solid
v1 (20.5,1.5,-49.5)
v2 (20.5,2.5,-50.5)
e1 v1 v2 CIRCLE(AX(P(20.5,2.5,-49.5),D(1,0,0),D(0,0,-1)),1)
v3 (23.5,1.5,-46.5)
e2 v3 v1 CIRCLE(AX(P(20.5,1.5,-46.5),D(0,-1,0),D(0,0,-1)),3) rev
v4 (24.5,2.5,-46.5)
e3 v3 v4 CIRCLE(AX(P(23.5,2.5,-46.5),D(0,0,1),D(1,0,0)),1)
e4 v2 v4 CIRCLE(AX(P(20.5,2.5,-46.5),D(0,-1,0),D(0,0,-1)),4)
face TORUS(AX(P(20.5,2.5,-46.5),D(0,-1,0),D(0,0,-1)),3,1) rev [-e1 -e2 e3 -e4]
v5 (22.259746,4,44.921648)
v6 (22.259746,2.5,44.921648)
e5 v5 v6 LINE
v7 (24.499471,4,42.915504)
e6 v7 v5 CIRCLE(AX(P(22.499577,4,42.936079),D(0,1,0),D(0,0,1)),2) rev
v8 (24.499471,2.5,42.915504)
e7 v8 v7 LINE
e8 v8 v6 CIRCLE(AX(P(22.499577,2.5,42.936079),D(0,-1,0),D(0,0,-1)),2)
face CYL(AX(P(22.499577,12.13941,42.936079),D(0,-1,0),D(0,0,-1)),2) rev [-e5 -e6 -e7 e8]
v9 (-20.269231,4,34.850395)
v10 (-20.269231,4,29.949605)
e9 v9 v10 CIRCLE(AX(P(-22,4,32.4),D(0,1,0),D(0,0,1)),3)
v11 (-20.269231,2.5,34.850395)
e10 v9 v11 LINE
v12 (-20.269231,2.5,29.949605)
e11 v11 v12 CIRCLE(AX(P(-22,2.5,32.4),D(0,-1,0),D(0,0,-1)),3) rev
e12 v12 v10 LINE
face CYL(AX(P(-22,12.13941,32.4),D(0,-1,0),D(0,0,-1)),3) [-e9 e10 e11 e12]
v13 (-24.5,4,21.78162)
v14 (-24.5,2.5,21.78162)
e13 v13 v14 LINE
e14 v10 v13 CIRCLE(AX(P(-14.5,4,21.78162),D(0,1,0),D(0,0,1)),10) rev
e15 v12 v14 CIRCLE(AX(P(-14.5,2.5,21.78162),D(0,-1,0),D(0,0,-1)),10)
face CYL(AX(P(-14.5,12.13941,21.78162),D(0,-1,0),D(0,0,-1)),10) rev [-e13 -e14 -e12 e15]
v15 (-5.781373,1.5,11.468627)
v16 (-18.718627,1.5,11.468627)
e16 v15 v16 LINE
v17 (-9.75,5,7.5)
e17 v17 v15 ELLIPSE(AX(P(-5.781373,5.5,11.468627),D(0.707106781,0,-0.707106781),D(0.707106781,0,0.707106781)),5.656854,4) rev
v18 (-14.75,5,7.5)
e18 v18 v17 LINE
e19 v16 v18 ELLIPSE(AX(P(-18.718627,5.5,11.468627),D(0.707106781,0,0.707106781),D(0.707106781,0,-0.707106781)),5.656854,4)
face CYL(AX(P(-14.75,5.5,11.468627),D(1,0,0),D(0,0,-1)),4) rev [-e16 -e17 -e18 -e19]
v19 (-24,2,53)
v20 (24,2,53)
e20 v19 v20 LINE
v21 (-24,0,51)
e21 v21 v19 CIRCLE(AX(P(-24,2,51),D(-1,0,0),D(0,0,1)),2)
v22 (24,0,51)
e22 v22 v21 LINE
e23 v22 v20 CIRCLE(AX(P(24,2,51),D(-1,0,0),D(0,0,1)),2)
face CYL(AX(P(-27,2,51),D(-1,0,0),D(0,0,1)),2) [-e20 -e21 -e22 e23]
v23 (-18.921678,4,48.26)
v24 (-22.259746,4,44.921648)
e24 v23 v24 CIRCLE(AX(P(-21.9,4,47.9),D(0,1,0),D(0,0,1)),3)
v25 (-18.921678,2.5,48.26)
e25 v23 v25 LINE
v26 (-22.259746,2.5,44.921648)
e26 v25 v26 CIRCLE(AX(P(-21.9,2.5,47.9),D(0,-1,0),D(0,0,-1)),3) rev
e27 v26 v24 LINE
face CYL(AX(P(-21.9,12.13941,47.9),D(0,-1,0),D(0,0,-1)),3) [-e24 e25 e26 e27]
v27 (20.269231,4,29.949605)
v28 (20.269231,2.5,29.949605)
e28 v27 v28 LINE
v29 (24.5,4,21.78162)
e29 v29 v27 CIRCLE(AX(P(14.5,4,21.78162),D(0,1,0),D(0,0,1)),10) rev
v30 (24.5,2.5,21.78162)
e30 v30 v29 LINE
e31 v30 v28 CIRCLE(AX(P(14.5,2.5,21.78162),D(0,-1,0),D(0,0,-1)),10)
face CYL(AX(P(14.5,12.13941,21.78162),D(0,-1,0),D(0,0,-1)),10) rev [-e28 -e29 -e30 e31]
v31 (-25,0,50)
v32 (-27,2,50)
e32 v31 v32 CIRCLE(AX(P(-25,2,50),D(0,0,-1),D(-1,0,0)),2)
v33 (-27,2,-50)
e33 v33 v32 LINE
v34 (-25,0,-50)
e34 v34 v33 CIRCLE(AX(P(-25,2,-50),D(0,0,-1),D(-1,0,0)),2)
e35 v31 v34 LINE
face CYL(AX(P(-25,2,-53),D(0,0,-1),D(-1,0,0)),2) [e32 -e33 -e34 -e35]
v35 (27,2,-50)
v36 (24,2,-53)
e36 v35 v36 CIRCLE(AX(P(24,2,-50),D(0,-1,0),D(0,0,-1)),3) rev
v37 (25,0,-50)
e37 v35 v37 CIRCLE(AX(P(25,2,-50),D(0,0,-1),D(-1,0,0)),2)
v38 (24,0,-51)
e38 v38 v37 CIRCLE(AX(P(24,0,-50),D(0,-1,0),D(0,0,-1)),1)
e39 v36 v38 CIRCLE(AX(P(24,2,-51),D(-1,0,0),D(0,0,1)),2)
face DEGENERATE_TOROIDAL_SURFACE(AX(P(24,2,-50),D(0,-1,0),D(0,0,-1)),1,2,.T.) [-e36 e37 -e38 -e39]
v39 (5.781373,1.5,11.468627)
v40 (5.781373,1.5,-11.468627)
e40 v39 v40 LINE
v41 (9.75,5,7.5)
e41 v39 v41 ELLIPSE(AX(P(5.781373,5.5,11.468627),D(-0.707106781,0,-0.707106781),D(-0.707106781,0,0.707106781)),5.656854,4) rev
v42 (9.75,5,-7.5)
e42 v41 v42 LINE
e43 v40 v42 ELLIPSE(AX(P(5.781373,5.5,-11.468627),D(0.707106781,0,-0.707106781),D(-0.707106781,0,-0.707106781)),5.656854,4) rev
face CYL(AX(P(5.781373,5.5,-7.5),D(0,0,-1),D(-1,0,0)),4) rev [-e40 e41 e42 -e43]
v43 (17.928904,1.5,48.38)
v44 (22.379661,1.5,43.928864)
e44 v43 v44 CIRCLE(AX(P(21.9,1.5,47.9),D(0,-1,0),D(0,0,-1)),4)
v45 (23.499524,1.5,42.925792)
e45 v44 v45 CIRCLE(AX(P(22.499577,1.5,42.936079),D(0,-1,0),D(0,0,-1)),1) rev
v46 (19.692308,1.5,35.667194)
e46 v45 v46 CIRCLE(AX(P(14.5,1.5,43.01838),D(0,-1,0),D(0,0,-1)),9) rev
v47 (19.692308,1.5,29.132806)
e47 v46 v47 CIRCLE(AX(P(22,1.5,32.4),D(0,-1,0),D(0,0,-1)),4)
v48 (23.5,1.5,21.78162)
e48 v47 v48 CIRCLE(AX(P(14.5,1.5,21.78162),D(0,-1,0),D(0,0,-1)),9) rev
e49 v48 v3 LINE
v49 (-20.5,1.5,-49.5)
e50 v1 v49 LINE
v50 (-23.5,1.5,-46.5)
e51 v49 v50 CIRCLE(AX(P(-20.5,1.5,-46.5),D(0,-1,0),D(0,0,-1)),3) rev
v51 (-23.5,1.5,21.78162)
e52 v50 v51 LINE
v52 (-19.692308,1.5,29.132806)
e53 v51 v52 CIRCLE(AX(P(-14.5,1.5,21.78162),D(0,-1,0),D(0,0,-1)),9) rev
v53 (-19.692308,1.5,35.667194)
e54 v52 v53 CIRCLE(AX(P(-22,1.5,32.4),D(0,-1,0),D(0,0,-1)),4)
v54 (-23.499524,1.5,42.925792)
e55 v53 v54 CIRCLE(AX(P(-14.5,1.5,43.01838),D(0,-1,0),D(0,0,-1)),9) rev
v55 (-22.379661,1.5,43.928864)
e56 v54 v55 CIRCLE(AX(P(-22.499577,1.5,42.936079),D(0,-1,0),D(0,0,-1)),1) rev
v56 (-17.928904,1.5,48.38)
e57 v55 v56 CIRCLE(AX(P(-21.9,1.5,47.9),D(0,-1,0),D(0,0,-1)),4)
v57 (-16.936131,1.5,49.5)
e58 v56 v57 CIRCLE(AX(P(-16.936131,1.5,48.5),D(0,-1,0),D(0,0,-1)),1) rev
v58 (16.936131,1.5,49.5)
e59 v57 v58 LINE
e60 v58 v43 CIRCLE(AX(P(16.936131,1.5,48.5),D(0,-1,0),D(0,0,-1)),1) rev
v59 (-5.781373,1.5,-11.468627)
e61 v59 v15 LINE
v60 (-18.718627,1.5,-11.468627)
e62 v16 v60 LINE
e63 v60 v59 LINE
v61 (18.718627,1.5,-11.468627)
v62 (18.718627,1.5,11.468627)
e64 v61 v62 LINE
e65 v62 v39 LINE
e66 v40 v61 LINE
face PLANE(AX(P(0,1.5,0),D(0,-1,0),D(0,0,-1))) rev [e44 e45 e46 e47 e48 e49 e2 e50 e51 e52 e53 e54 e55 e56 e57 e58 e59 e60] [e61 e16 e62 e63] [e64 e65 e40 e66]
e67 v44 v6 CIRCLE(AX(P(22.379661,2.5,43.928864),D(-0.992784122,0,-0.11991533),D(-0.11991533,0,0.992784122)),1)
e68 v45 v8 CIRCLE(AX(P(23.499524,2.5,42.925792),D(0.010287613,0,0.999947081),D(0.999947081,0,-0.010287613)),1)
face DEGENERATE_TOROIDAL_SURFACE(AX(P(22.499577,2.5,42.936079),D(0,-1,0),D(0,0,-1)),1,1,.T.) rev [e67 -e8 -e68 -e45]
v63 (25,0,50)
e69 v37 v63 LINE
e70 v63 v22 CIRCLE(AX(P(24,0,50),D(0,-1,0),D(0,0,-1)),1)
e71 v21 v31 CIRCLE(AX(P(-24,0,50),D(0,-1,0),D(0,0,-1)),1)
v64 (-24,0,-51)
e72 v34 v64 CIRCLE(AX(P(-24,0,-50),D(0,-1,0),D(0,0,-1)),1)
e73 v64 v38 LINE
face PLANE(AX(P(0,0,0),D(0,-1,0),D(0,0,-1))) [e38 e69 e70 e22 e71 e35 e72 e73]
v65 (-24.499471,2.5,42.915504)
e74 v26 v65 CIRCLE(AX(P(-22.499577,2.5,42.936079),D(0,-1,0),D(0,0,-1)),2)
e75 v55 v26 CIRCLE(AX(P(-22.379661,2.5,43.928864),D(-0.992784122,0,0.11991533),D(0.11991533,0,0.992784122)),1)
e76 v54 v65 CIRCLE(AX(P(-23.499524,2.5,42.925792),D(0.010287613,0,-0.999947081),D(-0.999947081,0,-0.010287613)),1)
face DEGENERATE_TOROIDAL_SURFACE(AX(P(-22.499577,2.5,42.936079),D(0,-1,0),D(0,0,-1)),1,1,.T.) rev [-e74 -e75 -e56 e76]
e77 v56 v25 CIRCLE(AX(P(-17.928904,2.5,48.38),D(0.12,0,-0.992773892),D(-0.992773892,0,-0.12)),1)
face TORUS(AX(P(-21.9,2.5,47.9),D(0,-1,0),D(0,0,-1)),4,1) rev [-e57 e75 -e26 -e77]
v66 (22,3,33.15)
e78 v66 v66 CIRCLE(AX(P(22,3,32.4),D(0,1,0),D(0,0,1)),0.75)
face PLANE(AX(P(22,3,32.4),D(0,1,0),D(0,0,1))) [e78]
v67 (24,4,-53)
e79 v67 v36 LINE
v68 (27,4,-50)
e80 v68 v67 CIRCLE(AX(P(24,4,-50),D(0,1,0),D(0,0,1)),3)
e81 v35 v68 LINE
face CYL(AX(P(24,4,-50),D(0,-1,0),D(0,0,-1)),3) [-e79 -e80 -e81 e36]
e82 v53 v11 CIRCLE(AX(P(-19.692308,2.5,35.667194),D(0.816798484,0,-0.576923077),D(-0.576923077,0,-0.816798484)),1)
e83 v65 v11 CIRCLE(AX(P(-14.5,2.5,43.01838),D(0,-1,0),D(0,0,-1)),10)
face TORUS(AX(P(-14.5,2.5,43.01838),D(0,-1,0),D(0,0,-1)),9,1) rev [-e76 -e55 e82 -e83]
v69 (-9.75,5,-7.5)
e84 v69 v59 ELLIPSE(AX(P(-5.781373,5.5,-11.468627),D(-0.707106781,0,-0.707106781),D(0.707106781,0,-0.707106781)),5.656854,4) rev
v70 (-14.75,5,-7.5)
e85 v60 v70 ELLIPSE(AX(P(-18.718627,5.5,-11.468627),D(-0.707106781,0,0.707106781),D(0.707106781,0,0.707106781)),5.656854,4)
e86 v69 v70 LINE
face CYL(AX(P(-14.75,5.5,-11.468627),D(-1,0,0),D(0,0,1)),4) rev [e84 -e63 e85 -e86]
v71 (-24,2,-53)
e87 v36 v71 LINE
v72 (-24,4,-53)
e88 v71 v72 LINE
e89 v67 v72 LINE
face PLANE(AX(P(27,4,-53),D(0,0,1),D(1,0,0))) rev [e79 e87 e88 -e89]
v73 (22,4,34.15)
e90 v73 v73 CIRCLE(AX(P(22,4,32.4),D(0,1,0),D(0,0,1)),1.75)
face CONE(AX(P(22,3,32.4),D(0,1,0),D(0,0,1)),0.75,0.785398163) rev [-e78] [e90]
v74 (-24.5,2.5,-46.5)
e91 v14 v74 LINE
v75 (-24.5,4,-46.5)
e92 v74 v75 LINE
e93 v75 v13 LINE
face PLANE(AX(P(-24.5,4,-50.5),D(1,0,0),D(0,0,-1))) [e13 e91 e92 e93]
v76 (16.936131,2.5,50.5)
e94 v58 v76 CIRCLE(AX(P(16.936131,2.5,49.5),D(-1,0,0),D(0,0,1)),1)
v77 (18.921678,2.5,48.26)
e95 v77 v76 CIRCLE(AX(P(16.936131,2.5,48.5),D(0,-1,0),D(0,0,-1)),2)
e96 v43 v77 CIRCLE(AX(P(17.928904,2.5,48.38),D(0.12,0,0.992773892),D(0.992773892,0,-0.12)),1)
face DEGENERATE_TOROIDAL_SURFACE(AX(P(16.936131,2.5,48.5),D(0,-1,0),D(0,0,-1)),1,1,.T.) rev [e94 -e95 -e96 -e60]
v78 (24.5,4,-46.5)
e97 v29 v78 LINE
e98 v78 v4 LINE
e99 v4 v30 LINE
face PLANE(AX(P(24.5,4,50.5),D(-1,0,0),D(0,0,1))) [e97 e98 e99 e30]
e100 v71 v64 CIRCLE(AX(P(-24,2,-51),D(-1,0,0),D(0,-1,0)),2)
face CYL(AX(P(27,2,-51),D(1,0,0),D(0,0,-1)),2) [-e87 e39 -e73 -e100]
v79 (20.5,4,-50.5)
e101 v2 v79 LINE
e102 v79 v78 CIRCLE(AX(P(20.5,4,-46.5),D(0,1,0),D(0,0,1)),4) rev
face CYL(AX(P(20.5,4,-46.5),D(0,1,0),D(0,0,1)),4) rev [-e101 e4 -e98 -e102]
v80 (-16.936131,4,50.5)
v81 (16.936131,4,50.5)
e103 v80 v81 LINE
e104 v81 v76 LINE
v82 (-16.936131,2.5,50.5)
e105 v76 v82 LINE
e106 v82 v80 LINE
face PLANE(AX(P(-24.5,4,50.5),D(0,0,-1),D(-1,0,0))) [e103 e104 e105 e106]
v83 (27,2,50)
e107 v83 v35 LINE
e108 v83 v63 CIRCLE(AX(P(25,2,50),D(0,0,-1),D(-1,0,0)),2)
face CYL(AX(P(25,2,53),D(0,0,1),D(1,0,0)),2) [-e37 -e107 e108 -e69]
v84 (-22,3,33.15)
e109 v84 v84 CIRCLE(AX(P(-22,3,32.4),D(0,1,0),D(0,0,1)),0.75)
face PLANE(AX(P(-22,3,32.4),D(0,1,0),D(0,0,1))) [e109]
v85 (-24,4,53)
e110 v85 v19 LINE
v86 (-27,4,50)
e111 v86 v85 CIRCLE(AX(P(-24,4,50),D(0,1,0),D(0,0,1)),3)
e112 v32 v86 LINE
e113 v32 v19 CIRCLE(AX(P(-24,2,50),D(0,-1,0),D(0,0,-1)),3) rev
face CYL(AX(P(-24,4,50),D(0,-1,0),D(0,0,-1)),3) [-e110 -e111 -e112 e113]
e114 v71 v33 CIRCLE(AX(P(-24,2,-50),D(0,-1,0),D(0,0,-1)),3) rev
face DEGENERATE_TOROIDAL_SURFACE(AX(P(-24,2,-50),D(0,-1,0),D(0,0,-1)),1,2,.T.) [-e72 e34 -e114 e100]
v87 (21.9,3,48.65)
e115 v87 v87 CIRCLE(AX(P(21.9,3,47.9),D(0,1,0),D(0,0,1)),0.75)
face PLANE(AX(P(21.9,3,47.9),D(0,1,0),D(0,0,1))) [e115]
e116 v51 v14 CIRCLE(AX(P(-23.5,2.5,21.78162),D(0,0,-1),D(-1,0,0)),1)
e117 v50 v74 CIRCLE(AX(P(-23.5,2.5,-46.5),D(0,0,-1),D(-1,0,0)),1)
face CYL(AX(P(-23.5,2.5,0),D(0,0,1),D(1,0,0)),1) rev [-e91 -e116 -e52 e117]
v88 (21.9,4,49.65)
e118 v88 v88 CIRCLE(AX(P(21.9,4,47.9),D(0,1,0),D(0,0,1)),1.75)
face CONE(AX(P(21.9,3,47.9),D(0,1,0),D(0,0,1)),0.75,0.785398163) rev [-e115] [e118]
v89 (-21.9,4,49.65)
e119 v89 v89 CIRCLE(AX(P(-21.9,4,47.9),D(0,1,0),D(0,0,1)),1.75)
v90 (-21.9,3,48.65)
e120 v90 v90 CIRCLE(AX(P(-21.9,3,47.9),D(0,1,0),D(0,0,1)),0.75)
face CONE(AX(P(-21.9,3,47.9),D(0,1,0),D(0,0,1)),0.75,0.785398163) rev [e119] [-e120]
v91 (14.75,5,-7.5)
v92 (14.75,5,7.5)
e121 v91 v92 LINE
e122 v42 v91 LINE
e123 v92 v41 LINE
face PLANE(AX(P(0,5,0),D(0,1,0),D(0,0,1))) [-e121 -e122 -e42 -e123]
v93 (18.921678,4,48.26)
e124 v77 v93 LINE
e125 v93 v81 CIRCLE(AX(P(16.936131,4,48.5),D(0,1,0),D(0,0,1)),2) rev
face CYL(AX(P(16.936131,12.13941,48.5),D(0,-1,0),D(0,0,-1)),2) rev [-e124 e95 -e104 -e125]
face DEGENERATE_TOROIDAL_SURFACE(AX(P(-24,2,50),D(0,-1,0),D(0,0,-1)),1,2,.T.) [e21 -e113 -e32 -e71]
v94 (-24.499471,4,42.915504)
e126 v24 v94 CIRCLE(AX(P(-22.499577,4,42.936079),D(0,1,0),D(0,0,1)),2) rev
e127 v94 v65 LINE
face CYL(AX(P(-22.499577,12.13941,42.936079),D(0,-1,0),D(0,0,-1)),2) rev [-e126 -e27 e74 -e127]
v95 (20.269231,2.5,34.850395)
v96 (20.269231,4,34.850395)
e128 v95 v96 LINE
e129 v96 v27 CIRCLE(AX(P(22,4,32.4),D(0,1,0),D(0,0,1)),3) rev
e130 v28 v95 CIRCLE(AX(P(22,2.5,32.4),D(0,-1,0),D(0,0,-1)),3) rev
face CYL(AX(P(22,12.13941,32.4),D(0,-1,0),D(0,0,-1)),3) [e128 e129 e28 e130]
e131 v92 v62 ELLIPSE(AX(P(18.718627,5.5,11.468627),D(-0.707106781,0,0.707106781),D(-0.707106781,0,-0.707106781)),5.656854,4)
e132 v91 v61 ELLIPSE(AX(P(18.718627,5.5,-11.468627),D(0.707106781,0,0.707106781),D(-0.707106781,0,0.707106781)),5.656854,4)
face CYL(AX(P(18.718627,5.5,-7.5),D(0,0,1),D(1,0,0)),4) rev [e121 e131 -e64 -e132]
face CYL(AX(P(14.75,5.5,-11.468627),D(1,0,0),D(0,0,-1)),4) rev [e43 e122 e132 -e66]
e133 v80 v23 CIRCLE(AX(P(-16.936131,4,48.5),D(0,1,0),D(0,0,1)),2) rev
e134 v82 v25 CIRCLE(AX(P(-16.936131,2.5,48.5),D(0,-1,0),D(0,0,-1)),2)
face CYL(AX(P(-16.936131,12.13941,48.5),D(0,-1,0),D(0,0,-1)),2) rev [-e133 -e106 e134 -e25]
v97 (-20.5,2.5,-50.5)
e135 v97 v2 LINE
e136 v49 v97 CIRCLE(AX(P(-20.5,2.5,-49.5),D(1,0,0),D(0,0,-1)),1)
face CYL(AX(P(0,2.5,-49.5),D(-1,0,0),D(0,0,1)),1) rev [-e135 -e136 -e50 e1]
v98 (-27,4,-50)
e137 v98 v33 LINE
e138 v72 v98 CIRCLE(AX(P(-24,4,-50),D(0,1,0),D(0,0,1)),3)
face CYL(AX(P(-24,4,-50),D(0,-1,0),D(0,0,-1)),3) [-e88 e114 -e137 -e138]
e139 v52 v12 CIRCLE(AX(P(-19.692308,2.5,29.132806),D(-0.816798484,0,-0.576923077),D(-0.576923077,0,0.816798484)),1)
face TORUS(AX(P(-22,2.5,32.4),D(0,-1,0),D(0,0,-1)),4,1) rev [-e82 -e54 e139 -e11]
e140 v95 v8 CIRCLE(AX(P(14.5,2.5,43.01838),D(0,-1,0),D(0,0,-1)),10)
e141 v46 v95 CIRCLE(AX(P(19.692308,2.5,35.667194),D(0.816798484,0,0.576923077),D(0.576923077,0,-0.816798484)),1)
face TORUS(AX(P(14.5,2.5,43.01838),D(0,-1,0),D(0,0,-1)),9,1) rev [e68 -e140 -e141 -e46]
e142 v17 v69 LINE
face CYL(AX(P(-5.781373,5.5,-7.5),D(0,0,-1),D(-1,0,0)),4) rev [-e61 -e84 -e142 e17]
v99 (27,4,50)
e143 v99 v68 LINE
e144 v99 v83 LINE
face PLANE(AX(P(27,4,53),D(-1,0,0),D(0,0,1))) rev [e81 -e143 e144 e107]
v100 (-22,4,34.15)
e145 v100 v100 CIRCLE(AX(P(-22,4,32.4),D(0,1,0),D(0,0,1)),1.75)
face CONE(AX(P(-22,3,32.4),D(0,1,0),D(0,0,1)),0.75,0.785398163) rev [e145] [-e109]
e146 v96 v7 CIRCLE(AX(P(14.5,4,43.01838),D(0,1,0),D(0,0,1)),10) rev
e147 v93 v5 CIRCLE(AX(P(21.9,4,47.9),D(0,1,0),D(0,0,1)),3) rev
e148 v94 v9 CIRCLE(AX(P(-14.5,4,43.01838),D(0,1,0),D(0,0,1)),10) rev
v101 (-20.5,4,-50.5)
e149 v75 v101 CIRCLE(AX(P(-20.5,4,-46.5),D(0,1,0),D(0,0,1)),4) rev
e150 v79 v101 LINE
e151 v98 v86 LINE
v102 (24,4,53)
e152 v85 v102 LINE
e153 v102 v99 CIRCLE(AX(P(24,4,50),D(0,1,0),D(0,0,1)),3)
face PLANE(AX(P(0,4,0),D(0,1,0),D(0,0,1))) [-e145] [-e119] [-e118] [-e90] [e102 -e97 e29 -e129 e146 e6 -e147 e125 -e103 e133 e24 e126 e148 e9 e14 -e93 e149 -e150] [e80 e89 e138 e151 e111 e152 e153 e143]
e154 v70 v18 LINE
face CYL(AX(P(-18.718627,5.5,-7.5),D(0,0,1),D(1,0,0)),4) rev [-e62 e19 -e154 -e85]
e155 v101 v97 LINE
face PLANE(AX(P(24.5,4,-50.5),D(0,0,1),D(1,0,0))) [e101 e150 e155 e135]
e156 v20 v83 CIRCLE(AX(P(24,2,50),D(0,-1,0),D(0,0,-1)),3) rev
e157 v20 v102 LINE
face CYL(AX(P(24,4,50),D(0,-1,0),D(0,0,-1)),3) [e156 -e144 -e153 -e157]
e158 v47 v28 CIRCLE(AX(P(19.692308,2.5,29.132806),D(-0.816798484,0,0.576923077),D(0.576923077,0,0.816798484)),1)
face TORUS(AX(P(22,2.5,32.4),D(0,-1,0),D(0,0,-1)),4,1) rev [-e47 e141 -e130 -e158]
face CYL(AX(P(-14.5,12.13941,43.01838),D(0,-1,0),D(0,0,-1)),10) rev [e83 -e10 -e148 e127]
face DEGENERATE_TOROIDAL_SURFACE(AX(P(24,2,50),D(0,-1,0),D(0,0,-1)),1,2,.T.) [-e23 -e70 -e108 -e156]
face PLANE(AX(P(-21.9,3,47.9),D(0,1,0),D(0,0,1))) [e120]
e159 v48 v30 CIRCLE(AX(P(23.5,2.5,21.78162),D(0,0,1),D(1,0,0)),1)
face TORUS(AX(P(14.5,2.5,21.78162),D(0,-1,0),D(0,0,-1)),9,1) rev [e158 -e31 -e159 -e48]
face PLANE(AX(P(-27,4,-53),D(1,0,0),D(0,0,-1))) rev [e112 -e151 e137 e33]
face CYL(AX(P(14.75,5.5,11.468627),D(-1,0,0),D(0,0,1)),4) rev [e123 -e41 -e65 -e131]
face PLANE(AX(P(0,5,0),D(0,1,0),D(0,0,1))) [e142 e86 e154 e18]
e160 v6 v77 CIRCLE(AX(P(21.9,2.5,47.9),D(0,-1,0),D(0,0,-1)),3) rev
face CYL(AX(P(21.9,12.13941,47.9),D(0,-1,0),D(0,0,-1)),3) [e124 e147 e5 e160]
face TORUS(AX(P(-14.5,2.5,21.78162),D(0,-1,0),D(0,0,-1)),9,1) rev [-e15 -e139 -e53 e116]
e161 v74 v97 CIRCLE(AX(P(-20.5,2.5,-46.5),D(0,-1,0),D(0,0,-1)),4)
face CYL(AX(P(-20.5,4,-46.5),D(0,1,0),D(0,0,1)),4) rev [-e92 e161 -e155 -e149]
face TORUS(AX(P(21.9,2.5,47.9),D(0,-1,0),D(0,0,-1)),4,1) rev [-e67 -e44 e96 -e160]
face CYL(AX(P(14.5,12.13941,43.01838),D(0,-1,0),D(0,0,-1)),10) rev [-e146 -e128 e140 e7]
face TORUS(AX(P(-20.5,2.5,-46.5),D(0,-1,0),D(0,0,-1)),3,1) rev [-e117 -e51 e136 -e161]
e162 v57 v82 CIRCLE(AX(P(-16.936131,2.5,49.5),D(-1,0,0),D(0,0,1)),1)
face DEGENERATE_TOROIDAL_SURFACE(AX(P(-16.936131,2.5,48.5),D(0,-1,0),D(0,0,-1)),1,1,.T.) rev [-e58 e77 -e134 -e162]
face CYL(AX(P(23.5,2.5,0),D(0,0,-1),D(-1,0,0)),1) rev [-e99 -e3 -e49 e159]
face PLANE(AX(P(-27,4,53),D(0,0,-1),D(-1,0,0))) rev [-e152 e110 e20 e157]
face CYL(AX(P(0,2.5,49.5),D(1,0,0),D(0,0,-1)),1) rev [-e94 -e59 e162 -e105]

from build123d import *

# Parameters (mm, degrees)
SKETCH1_W            = 49
SKETCH1_H            = 101
BOSS_EXTRUDE1_DEPTH  = 1.5
SKETCH2_W            = 54
SKETCH2_H            = 106
SKETCH2_W_2          = 49
SKETCH2_H_2          = 101
BOSS_EXTRUDE2_DEPTH  = 4
BOSS_EXTRUDE3_DEPTH  = 4
SKETCH8_W            = 5
SKETCH8_H            = 15
BOSS_EXTRUDE4_DEPTH  = 3.5
FILLET3_R            = 4
FILLET3_OF_MIRROR1_R = 4
SKETCH4_R            = 1.75
CUT_EXTRUDE1_DEPTH   = 1
SKETCH5_R            = 1.75
CUT_EXTRUDE2_DEPTH   = 1
FILLET1_R            = 3
FILLET2_R            = 10
CHAMFER1_SIZE        = 1
CHAMFER2_SIZE        = 1
FILLET4_R            = 2
FILLET6_R            = 4
FILLET5_R            = 1
FILLET7_R            = 2


# Some blends are built 0.0001 mm under size
with BuildPart() as part:
    # Sketch1 → Boss-Extrude1 (new body)
    with BuildSketch(Plane(origin=(0, 0, 0), x_dir=(1, 0, 0), z_dir=(0, 1, 0))):
        Rectangle(SKETCH1_W, SKETCH1_H)
    extrude(amount=BOSS_EXTRUDE1_DEPTH)

    # Sketch2 → Boss-Extrude2 (add)
    with BuildSketch(Plane(origin=(0, 0, 0), x_dir=(1, 0, 0), z_dir=(0, 1, 0))):
        Rectangle(SKETCH2_W, SKETCH2_H)
        Rectangle(SKETCH2_W_2, SKETCH2_H_2, mode=Mode.SUBTRACT)
    extrude(amount=BOSS_EXTRUDE2_DEPTH)

    # Sketch3 → Boss-Extrude3 (add)
    with BuildSketch(Plane(origin=(0, 0, 0), x_dir=(1, 0, 0), z_dir=(0, 1, 0))):
        with BuildLine():
            Line((-24.5, -30.741687605), (-24.5, -34.058312395))
            ThreePointArc((-24.5, -34.058312395), (-19, -32.4), (-24.5, -30.741687605))
        make_face()
        with BuildLine():
            Line((-24.5, -46.403337045), (-24.5, -50.5))
            Line((-24.5, -50.5), (-20.403337045, -50.5))
            ThreePointArc((-20.403337045, -50.5), (-19.778679656, -45.778679656), (-24.5, -46.403337045))
        make_face()
    boss_extrude3 = extrude(amount=BOSS_EXTRUDE3_DEPTH)

    # Sketch8 → Boss-Extrude4 (add)
    with BuildSketch(Plane(origin=(0, 1.5, 0), x_dir=(1, 0, 0), z_dir=(0, 1, 0))):
        with Locations((-12.25, 0)):
            Rectangle(SKETCH8_W, SKETCH8_H)
    boss_extrude4 = extrude(amount=BOSS_EXTRUDE4_DEPTH)

    # Fillet3
    # the kernel refuses this fillet: 4 mm, written as the material it adds along each edge
    with BuildSketch(Plane(origin=(-14.75, 1.5, -7.5), x_dir=(0, 0, -1), z_dir=(1, 0, 0)), Plane(origin=(-9.75, 1.5, 7.5), x_dir=(0, 0, 1), z_dir=(-1, 0, 0))) as fillet3_piece_1:
        with BuildLine():
            CenterArc((3.968626967, 4), FILLET3_R, 187.180755781, 82.819244219)
            Line((0, 3.5), (-0.079372539, 3.49))
            ThreePointArc((-0.079372539, 3.49), (-0.08, 1.75), (-0.08, 0))
            Line((-0.08, 0), (0, -0.08))
            Line((0, -0.08), (3.968626967, -0.08))
            Line((3.968626967, -0.08), (3.968626967, 0))
        make_face()
    extrude(amount=5)
    with BuildSketch(Plane(origin=(-9.75, 1.5, -7.5), x_dir=(1, 0, 0), z_dir=(0, 0, 1)), Plane(origin=(-14.75, 1.5, 7.5), x_dir=(-1, 0, 0), z_dir=(0, 0, -1))) as fillet3_piece_2:
        with BuildLine():
            CenterArc((3.968626967, 4), FILLET3_R, 187.180755781, 82.819244219)
            Line((0, 3.5), (-0.079372539, 3.49))
            ThreePointArc((-0.079372539, 3.49), (-0.08, 1.75), (-0.08, 0))
            Line((-0.08, 0), (0, -0.08))
            Line((0, -0.08), (3.968626967, -0.08))
            Line((3.968626967, -0.08), (3.968626967, 0))
        make_face()
    extrude(amount=15)
    with BuildSketch(Plane(origin=(-14.75, 1.5, 7.5), x_dir=(-1, 0, 0), z_dir=(0, 0, -1))) as fillet3_piece_3a_section:
        with BuildLine():
            CenterArc((3.968626967, 4), FILLET3_R, 187.180755781, 82.819244219)
            Line((0, 3.5), (-0.079372539, 3.49))
            ThreePointArc((-0.079372539, 3.49), (-0.08, 1.75), (-0.08, 0))
            Line((-0.08, 0), (0, -0.08))
            Line((0, -0.08), (3.968626967, -0.08))
            Line((3.968626967, -0.08), (3.968626967, 0))
        make_face()
    fillet3_piece_3a = extrude(amount=24.921567416, mode=Mode.PRIVATE)
    fillet3_piece_3a = split(fillet3_piece_3a, bisect_by=Plane(origin=(-15.663794772, 2.350141375, -7.5), z_dir=(0, 0, -1)), keep=Keep.TOP, mode=Mode.PRIVATE)
    with BuildSketch(Plane(origin=(-24.671567416, 1.5, -7.5), x_dir=(0, 0, -1), z_dir=(1, 0, 0))) as fillet3_piece_3b_section:
        with BuildLine():
            CenterArc((3.968626967, 4), FILLET3_R, 187.180755781, 82.819244219)
            Line((0, 3.5), (-0.079372539, 3.49))
            ThreePointArc((-0.079372539, 3.49), (-0.08, 1.75), (-0.08, 0))
            Line((-0.08, 0), (0, -0.08))
            Line((0, -0.08), (3.968626967, -0.08))
            Line((3.968626967, -0.08), (3.968626967, 0))
        make_face()
    fillet3_piece_3b = extrude(amount=14.921567416, mode=Mode.PRIVATE)
    fillet3_piece_3b = split(fillet3_piece_3b, bisect_by=Plane(origin=(-14.75, 2.350141375, -8.413794772), z_dir=(-1, 0, 0)), keep=Keep.TOP, mode=Mode.PRIVATE)
    fillet3_piece_3 = fillet3_piece_3a & fillet3_piece_3b
    add(fillet3_piece_3)
    with BuildSketch(Plane(origin=(-9.75, 1.5, -17.421567416), x_dir=(1, 0, 0), z_dir=(0, 0, 1))) as fillet3_piece_4a_section:
        with BuildLine():
            CenterArc((3.968626967, 4), FILLET3_R, 187.180755781, 82.819244219)
            Line((0, 3.5), (-0.079372539, 3.49))
            ThreePointArc((-0.079372539, 3.49), (-0.08, 1.75), (-0.08, 0))
            Line((-0.08, 0), (0, -0.08))
            Line((0, -0.08), (3.968626967, -0.08))
            Line((3.968626967, -0.08), (3.968626967, 0))
        make_face()
    fillet3_piece_4a = extrude(amount=24.921567416, mode=Mode.PRIVATE)
    fillet3_piece_4a = split(fillet3_piece_4a, bisect_by=Plane(origin=(-8.836205228, 2.350141375, -7.5), z_dir=(0, 0, -1)), keep=Keep.TOP, mode=Mode.PRIVATE)
    with BuildSketch(Plane(origin=(-14.75, 1.5, -7.5), x_dir=(0, 0, -1), z_dir=(1, 0, 0))) as fillet3_piece_4b_section:
        with BuildLine():
            CenterArc((3.968626967, 4), FILLET3_R, 187.180755781, 82.819244219)
            Line((0, 3.5), (-0.079372539, 3.49))
            ThreePointArc((-0.079372539, 3.49), (-0.08, 1.75), (-0.08, 0))
            Line((-0.08, 0), (0, -0.08))
            Line((0, -0.08), (3.968626967, -0.08))
            Line((3.968626967, -0.08), (3.968626967, 0))
        make_face()
    fillet3_piece_4b = extrude(amount=14.921567416, mode=Mode.PRIVATE)
    fillet3_piece_4b = split(fillet3_piece_4b, bisect_by=Plane(origin=(-9.75, 2.350141375, -8.413794772), z_dir=(1, 0, 0)), keep=Keep.TOP, mode=Mode.PRIVATE)
    fillet3_piece_4 = fillet3_piece_4a & fillet3_piece_4b
    add(fillet3_piece_4)
    with BuildSketch(Plane(origin=(0.171567416, 1.5, 7.5), x_dir=(0, 0, 1), z_dir=(-1, 0, 0))) as fillet3_piece_5a_section:
        with BuildLine():
            CenterArc((3.968626967, 4), FILLET3_R, 187.180755781, 82.819244219)
            Line((0, 3.5), (-0.079372539, 3.49))
            ThreePointArc((-0.079372539, 3.49), (-0.08, 1.75), (-0.08, 0))
            Line((-0.08, 0), (0, -0.08))
            Line((0, -0.08), (3.968626967, -0.08))
            Line((3.968626967, -0.08), (3.968626967, 0))
        make_face()
    fillet3_piece_5a = extrude(amount=14.921567416, mode=Mode.PRIVATE)
    fillet3_piece_5a = split(fillet3_piece_5a, bisect_by=Plane(origin=(-9.75, 2.350141375, 8.413794772), z_dir=(1, 0, 0)), keep=Keep.TOP, mode=Mode.PRIVATE)
    with BuildSketch(Plane(origin=(-9.75, 1.5, -7.5), x_dir=(1, 0, 0), z_dir=(0, 0, 1))) as fillet3_piece_5b_section:
        with BuildLine():
            CenterArc((3.968626967, 4), FILLET3_R, 187.180755781, 82.819244219)
            Line((0, 3.5), (-0.079372539, 3.49))
            ThreePointArc((-0.079372539, 3.49), (-0.08, 1.75), (-0.08, 0))
            Line((-0.08, 0), (0, -0.08))
            Line((0, -0.08), (3.968626967, -0.08))
            Line((3.968626967, -0.08), (3.968626967, 0))
        make_face()
    fillet3_piece_5b = extrude(amount=24.921567416, mode=Mode.PRIVATE)
    fillet3_piece_5b = split(fillet3_piece_5b, bisect_by=Plane(origin=(-8.836205228, 2.350141375, 7.5), z_dir=(0, 0, 1)), keep=Keep.TOP, mode=Mode.PRIVATE)
    fillet3_piece_5 = fillet3_piece_5a & fillet3_piece_5b
    add(fillet3_piece_5)
    with BuildSketch(Plane(origin=(-14.75, 1.5, 17.421567416), x_dir=(-1, 0, 0), z_dir=(0, 0, -1))) as fillet3_piece_6a_section:
        with BuildLine():
            CenterArc((3.968626967, 4), FILLET3_R, 187.180755781, 82.819244219)
            Line((0, 3.5), (-0.079372539, 3.49))
            ThreePointArc((-0.079372539, 3.49), (-0.08, 1.75), (-0.08, 0))
            Line((-0.08, 0), (0, -0.08))
            Line((0, -0.08), (3.968626967, -0.08))
            Line((3.968626967, -0.08), (3.968626967, 0))
        make_face()
    fillet3_piece_6a = extrude(amount=24.921567416, mode=Mode.PRIVATE)
    fillet3_piece_6a = split(fillet3_piece_6a, bisect_by=Plane(origin=(-15.663794772, 2.350141375, 7.5), z_dir=(0, 0, 1)), keep=Keep.TOP, mode=Mode.PRIVATE)
    with BuildSketch(Plane(origin=(-9.75, 1.5, 7.5), x_dir=(0, 0, 1), z_dir=(-1, 0, 0))) as fillet3_piece_6b_section:
        with BuildLine():
            CenterArc((3.968626967, 4), FILLET3_R, 187.180755781, 82.819244219)
            Line((0, 3.5), (-0.079372539, 3.49))
            ThreePointArc((-0.079372539, 3.49), (-0.08, 1.75), (-0.08, 0))
            Line((-0.08, 0), (0, -0.08))
            Line((0, -0.08), (3.968626967, -0.08))
            Line((3.968626967, -0.08), (3.968626967, 0))
        make_face()
    fillet3_piece_6b = extrude(amount=14.921567416, mode=Mode.PRIVATE)
    fillet3_piece_6b = split(fillet3_piece_6b, bisect_by=Plane(origin=(-14.75, 2.350141375, 8.413794772), z_dir=(-1, 0, 0)), keep=Keep.TOP, mode=Mode.PRIVATE)
    fillet3_piece_6 = fillet3_piece_6a & fillet3_piece_6b
    add(fillet3_piece_6)

    # Mirror1: Boss-Extrude3, Boss-Extrude4 across plane
    add(boss_extrude3.mirror(Plane(origin=(0, 0, 0), x_dir=(0, 0, 1), z_dir=(1, 0, 0))))
    add(boss_extrude4.mirror(Plane(origin=(0, 0, 0), x_dir=(0, 0, 1), z_dir=(1, 0, 0))))

    # Fillet3 of Mirror1
    # the kernel refuses this fillet: 4 mm, written as the material it adds along each edge
    with BuildSketch(Plane(origin=(14.75, 1.5, -7.5), x_dir=(0, 0, -1), z_dir=(-1, 0, 0)), Plane(origin=(9.75, 1.5, 7.5), x_dir=(0, 0, 1), z_dir=(1, 0, 0))) as fillet3_of_mirror1_piece_1:
        with BuildLine():
            CenterArc((3.968626967, -4), FILLET3_OF_MIRROR1_R, 90, 82.819244219)
            Line((0, -3.5), (-0.079372539, -3.49))
            ThreePointArc((-0.079372539, -3.49), (-0.08, -1.75), (-0.08, 0))
            Line((-0.08, 0), (0, 0.08))
            Line((0, 0.08), (3.968626967, 0.08))
            Line((3.968626967, 0.08), (3.968626967, 0))
        make_face()
    extrude(amount=5)
    with BuildSketch(Plane(origin=(9.75, 1.5, -7.5), x_dir=(-1, 0, 0), z_dir=(0, 0, 1)), Plane(origin=(14.75, 1.5, 7.5), x_dir=(1, 0, 0), z_dir=(0, 0, -1))) as fillet3_of_mirror1_piece_2:
        with BuildLine():
            CenterArc((3.968626967, -4), FILLET3_OF_MIRROR1_R, 90, 82.819244219)
            Line((0, -3.5), (-0.079372539, -3.49))
            ThreePointArc((-0.079372539, -3.49), (-0.08, -1.75), (-0.08, 0))
            Line((-0.08, 0), (0, 0.08))
            Line((0, 0.08), (3.968626967, 0.08))
            Line((3.968626967, 0.08), (3.968626967, 0))
        make_face()
    extrude(amount=15)
    with BuildSketch(Plane(origin=(24.671567416, 1.5, -7.5), x_dir=(0, 0, -1), z_dir=(-1, 0, 0))) as fillet3_of_mirror1_piece_3a_section:
        with BuildLine():
            CenterArc((3.968626967, -4), FILLET3_OF_MIRROR1_R, 90, 82.819244219)
            Line((0, -3.5), (-0.079372539, -3.49))
            ThreePointArc((-0.079372539, -3.49), (-0.08, -1.75), (-0.08, 0))
            Line((-0.08, 0), (0, 0.08))
            Line((0, 0.08), (3.968626967, 0.08))
            Line((3.968626967, 0.08), (3.968626967, 0))
        make_face()
    fillet3_of_mirror1_piece_3a = extrude(amount=14.921567416, mode=Mode.PRIVATE)
    fillet3_of_mirror1_piece_3a = split(fillet3_of_mirror1_piece_3a, bisect_by=Plane(origin=(14.75, 2.350141375, -8.413794772), z_dir=(1, 0, 0)), keep=Keep.TOP, mode=Mode.PRIVATE)
    with BuildSketch(Plane(origin=(14.75, 1.5, 7.5), x_dir=(1, 0, 0), z_dir=(0, 0, -1))) as fillet3_of_mirror1_piece_3b_section:
        with BuildLine():
            CenterArc((3.968626967, -4), FILLET3_OF_MIRROR1_R, 90, 82.819244219)
            Line((0, -3.5), (-0.079372539, -3.49))
            ThreePointArc((-0.079372539, -3.49), (-0.08, -1.75), (-0.08, 0))
            Line((-0.08, 0), (0, 0.08))
            Line((0, 0.08), (3.968626967, 0.08))
            Line((3.968626967, 0.08), (3.968626967, 0))
        make_face()
    fillet3_of_mirror1_piece_3b = extrude(amount=24.921567416, mode=Mode.PRIVATE)
    fillet3_of_mirror1_piece_3b = split(fillet3_of_mirror1_piece_3b, bisect_by=Plane(origin=(15.663794772, 2.350141375, -7.5), z_dir=(0, 0, -1)), keep=Keep.TOP, mode=Mode.PRIVATE)
    fillet3_of_mirror1_piece_3 = fillet3_of_mirror1_piece_3a & fillet3_of_mirror1_piece_3b
    add(fillet3_of_mirror1_piece_3)
    with BuildSketch(Plane(origin=(14.75, 1.5, -7.5), x_dir=(0, 0, -1), z_dir=(-1, 0, 0))) as fillet3_of_mirror1_piece_4a_section:
        with BuildLine():
            CenterArc((3.968626967, -4), FILLET3_OF_MIRROR1_R, 90, 82.819244219)
            Line((0, -3.5), (-0.079372539, -3.49))
            ThreePointArc((-0.079372539, -3.49), (-0.08, -1.75), (-0.08, 0))
            Line((-0.08, 0), (0, 0.08))
            Line((0, 0.08), (3.968626967, 0.08))
            Line((3.968626967, 0.08), (3.968626967, 0))
        make_face()
    fillet3_of_mirror1_piece_4a = extrude(amount=14.921567416, mode=Mode.PRIVATE)
    fillet3_of_mirror1_piece_4a = split(fillet3_of_mirror1_piece_4a, bisect_by=Plane(origin=(9.75, 2.350141375, -8.413794772), z_dir=(-1, 0, 0)), keep=Keep.TOP, mode=Mode.PRIVATE)
    with BuildSketch(Plane(origin=(9.75, 1.5, -17.421567416), x_dir=(-1, 0, 0), z_dir=(0, 0, 1))) as fillet3_of_mirror1_piece_4b_section:
        with BuildLine():
            CenterArc((3.968626967, -4), FILLET3_OF_MIRROR1_R, 90, 82.819244219)
            Line((0, -3.5), (-0.079372539, -3.49))
            ThreePointArc((-0.079372539, -3.49), (-0.08, -1.75), (-0.08, 0))
            Line((-0.08, 0), (0, 0.08))
            Line((0, 0.08), (3.968626967, 0.08))
            Line((3.968626967, 0.08), (3.968626967, 0))
        make_face()
    fillet3_of_mirror1_piece_4b = extrude(amount=24.921567416, mode=Mode.PRIVATE)
    fillet3_of_mirror1_piece_4b = split(fillet3_of_mirror1_piece_4b, bisect_by=Plane(origin=(8.836205228, 2.350141375, -7.5), z_dir=(0, 0, -1)), keep=Keep.TOP, mode=Mode.PRIVATE)
    fillet3_of_mirror1_piece_4 = fillet3_of_mirror1_piece_4a & fillet3_of_mirror1_piece_4b
    add(fillet3_of_mirror1_piece_4)
    with BuildSketch(Plane(origin=(9.75, 1.5, -7.5), x_dir=(-1, 0, 0), z_dir=(0, 0, 1))) as fillet3_of_mirror1_piece_5a_section:
        with BuildLine():
            CenterArc((3.968626967, -4), FILLET3_OF_MIRROR1_R, 90, 82.819244219)
            Line((0, -3.5), (-0.079372539, -3.49))
            ThreePointArc((-0.079372539, -3.49), (-0.08, -1.75), (-0.08, 0))
            Line((-0.08, 0), (0, 0.08))
            Line((0, 0.08), (3.968626967, 0.08))
            Line((3.968626967, 0.08), (3.968626967, 0))
        make_face()
    fillet3_of_mirror1_piece_5a = extrude(amount=24.921567416, mode=Mode.PRIVATE)
    fillet3_of_mirror1_piece_5a = split(fillet3_of_mirror1_piece_5a, bisect_by=Plane(origin=(8.836205228, 2.350141375, 7.5), z_dir=(0, 0, 1)), keep=Keep.TOP, mode=Mode.PRIVATE)
    with BuildSketch(Plane(origin=(-0.171567416, 1.5, 7.5), x_dir=(0, 0, 1), z_dir=(1, 0, 0))) as fillet3_of_mirror1_piece_5b_section:
        with BuildLine():
            CenterArc((3.968626967, -4), FILLET3_OF_MIRROR1_R, 90, 82.819244219)
            Line((0, -3.5), (-0.079372539, -3.49))
            ThreePointArc((-0.079372539, -3.49), (-0.08, -1.75), (-0.08, 0))
            Line((-0.08, 0), (0, 0.08))
            Line((0, 0.08), (3.968626967, 0.08))
            Line((3.968626967, 0.08), (3.968626967, 0))
        make_face()
    fillet3_of_mirror1_piece_5b = extrude(amount=14.921567416, mode=Mode.PRIVATE)
    fillet3_of_mirror1_piece_5b = split(fillet3_of_mirror1_piece_5b, bisect_by=Plane(origin=(9.75, 2.350141375, 8.413794772), z_dir=(-1, 0, 0)), keep=Keep.TOP, mode=Mode.PRIVATE)
    fillet3_of_mirror1_piece_5 = fillet3_of_mirror1_piece_5a & fillet3_of_mirror1_piece_5b
    add(fillet3_of_mirror1_piece_5)
    with BuildSketch(Plane(origin=(9.75, 1.5, 7.5), x_dir=(0, 0, 1), z_dir=(1, 0, 0))) as fillet3_of_mirror1_piece_6a_section:
        with BuildLine():
            CenterArc((3.968626967, -4), FILLET3_OF_MIRROR1_R, 90, 82.819244219)
            Line((0, -3.5), (-0.079372539, -3.49))
            ThreePointArc((-0.079372539, -3.49), (-0.08, -1.75), (-0.08, 0))
            Line((-0.08, 0), (0, 0.08))
            Line((0, 0.08), (3.968626967, 0.08))
            Line((3.968626967, 0.08), (3.968626967, 0))
        make_face()
    fillet3_of_mirror1_piece_6a = extrude(amount=14.921567416, mode=Mode.PRIVATE)
    fillet3_of_mirror1_piece_6a = split(fillet3_of_mirror1_piece_6a, bisect_by=Plane(origin=(14.75, 2.350141375, 8.413794772), z_dir=(1, 0, 0)), keep=Keep.TOP, mode=Mode.PRIVATE)
    with BuildSketch(Plane(origin=(14.75, 1.5, 17.421567416), x_dir=(1, 0, 0), z_dir=(0, 0, -1))) as fillet3_of_mirror1_piece_6b_section:
        with BuildLine():
            CenterArc((3.968626967, -4), FILLET3_OF_MIRROR1_R, 90, 82.819244219)
            Line((0, -3.5), (-0.079372539, -3.49))
            ThreePointArc((-0.079372539, -3.49), (-0.08, -1.75), (-0.08, 0))
            Line((-0.08, 0), (0, 0.08))
            Line((0, 0.08), (3.968626967, 0.08))
            Line((3.968626967, 0.08), (3.968626967, 0))
        make_face()
    fillet3_of_mirror1_piece_6b = extrude(amount=24.921567416, mode=Mode.PRIVATE)
    fillet3_of_mirror1_piece_6b = split(fillet3_of_mirror1_piece_6b, bisect_by=Plane(origin=(15.663794772, 2.350141375, 7.5), z_dir=(0, 0, 1)), keep=Keep.TOP, mode=Mode.PRIVATE)
    fillet3_of_mirror1_piece_6 = fillet3_of_mirror1_piece_6a & fillet3_of_mirror1_piece_6b
    add(fillet3_of_mirror1_piece_6)

    # Sketch4 → Cut-Extrude1 (cut)
    with BuildSketch(Plane(origin=(0, 4, 0), x_dir=(1, 0, 0), z_dir=(0, 1, 0))):
        with Locations(Location((-21.9, -47.9, 0), (0, 0, 270))):
            Circle(SKETCH4_R)
        with Locations(Location((21.9, -47.9, 0), (0, 0, 270))):
            Circle(SKETCH4_R)
    extrude(amount=-CUT_EXTRUDE1_DEPTH, mode=Mode.SUBTRACT)

    # Sketch5 → Cut-Extrude2 (cut)
    with BuildSketch(Plane(origin=(0, 4, 0), x_dir=(1, 0, 0), z_dir=(0, 1, 0))):
        with Locations(Location((-22, -32.4, 0), (0, 0, 270))):
            Circle(SKETCH5_R)
        with Locations(Location((22, -32.4, 0), (0, 0, 270))):
            Circle(SKETCH5_R)
    extrude(amount=-CUT_EXTRUDE2_DEPTH, mode=Mode.SUBTRACT)

    # Fillet1
    fillet1_edges = [part.edges().sort_by_distance(p)[0] for p in [
        (-27, 2, 53),
        (27, 2, 53),
        (27, 2, -53),
        (-27, 2, -53),
    ]]
    fillet(fillet1_edges, radius=FILLET1_R)

    # Fillet2
    fillet2_edges = [part.edges().sort_by_distance(p)[0] for p in [
        (24.5, 2.75, 34.058312395),
        (24.5, 2.75, 30.741687605),
        (-24.5, 2.75, 34.058312395),
        (-24.5, 2.75, 30.741687605),
    ]]
    fillet(fillet2_edges, radius=FILLET2_R)

    # Chamfer1
    chamfer1_edges = [part.edges().sort_by_distance(p)[0] for p in [
        (-22, 3, 30.65),
        (22, 3, 30.65),
    ]]
    chamfer(chamfer1_edges, length=CHAMFER1_SIZE - 0.0001)  # a hair under: the kernel refuses the full size

    # Chamfer2
    chamfer2_edges = [part.edges().sort_by_distance(p)[0] for p in [
        (-21.9, 3, 46.15),
        (21.9, 3, 46.15),
    ]]
    chamfer(chamfer2_edges, length=CHAMFER2_SIZE - 0.0001)  # a hair under: the kernel refuses the full size

    # Fillet4
    fillet4_edges = [part.edges().sort_by_distance(p)[0] for p in [
        (24.5, 2.75, 46.403337045),
        (20.403337045, 2.75, 50.5),
        (-20.403337045, 2.75, 50.5),
        (-24.5, 2.75, 46.403337045),
    ]]
    fillet(fillet4_edges, radius=FILLET4_R)

    # Fillet6
    fillet6_edges = [part.edges().sort_by_distance(p)[0] for p in [
        (24.5, 2.75, -50.5),
        (-24.5, 2.75, -50.5),
    ]]
    fillet(fillet6_edges, radius=FILLET6_R)

    # Fillet5
    fillet5_edges = [part.edges().sort_by_distance(p)[0] for p in [
        (19, 1.5, 32.4),
        (24.5, 1.5, -12.359190145),
        (-19, 1.5, 32.4),
        (-23.355759821, 1.5, 38.373434867),
        (-23.379535677, 1.5, 26.380950764),
        (23.379535677, 1.5, 26.380950764),
        (19.778589199, 1.5, 45.778770118),
        (-19.778589199, 1.5, 45.778770118),
        (0, 1.5, 50.5),
        (23.355759821, 1.5, 38.373434867),
        (-23.833971189, 1.5, 44.42584152),
        (-18.432793496, 1.5, 49.826649916),
        (18.432793496, 1.5, 49.826649916),
        (23.833971189, 1.5, 44.42584152),
        (0, 1.5, -50.5),
        (-24.5, 1.5, -12.359190145),
        (-23.328427125, 1.5, -49.328427125),
        (23.328427125, 1.5, -49.328427125),
    ]]
    fillet(fillet5_edges, radius=FILLET5_R)

    # Fillet7
    fillet7_edges = [part.edges().sort_by_distance(p)[0] for p in [
        (0, 0, 53),
        (-27, 0, 0),
        (0, 0, -53),
        (27, 0, 0),
        (-26.121320344, 0, -52.121320344),
        (26.121320344, 0, -52.121320344),
        (26.121320344, 0, 52.121320344),
        (-26.121320344, 0, 52.121320344),
    ]]
    fillet(fillet7_edges, radius=FILLET7_R)


solid = part.part
